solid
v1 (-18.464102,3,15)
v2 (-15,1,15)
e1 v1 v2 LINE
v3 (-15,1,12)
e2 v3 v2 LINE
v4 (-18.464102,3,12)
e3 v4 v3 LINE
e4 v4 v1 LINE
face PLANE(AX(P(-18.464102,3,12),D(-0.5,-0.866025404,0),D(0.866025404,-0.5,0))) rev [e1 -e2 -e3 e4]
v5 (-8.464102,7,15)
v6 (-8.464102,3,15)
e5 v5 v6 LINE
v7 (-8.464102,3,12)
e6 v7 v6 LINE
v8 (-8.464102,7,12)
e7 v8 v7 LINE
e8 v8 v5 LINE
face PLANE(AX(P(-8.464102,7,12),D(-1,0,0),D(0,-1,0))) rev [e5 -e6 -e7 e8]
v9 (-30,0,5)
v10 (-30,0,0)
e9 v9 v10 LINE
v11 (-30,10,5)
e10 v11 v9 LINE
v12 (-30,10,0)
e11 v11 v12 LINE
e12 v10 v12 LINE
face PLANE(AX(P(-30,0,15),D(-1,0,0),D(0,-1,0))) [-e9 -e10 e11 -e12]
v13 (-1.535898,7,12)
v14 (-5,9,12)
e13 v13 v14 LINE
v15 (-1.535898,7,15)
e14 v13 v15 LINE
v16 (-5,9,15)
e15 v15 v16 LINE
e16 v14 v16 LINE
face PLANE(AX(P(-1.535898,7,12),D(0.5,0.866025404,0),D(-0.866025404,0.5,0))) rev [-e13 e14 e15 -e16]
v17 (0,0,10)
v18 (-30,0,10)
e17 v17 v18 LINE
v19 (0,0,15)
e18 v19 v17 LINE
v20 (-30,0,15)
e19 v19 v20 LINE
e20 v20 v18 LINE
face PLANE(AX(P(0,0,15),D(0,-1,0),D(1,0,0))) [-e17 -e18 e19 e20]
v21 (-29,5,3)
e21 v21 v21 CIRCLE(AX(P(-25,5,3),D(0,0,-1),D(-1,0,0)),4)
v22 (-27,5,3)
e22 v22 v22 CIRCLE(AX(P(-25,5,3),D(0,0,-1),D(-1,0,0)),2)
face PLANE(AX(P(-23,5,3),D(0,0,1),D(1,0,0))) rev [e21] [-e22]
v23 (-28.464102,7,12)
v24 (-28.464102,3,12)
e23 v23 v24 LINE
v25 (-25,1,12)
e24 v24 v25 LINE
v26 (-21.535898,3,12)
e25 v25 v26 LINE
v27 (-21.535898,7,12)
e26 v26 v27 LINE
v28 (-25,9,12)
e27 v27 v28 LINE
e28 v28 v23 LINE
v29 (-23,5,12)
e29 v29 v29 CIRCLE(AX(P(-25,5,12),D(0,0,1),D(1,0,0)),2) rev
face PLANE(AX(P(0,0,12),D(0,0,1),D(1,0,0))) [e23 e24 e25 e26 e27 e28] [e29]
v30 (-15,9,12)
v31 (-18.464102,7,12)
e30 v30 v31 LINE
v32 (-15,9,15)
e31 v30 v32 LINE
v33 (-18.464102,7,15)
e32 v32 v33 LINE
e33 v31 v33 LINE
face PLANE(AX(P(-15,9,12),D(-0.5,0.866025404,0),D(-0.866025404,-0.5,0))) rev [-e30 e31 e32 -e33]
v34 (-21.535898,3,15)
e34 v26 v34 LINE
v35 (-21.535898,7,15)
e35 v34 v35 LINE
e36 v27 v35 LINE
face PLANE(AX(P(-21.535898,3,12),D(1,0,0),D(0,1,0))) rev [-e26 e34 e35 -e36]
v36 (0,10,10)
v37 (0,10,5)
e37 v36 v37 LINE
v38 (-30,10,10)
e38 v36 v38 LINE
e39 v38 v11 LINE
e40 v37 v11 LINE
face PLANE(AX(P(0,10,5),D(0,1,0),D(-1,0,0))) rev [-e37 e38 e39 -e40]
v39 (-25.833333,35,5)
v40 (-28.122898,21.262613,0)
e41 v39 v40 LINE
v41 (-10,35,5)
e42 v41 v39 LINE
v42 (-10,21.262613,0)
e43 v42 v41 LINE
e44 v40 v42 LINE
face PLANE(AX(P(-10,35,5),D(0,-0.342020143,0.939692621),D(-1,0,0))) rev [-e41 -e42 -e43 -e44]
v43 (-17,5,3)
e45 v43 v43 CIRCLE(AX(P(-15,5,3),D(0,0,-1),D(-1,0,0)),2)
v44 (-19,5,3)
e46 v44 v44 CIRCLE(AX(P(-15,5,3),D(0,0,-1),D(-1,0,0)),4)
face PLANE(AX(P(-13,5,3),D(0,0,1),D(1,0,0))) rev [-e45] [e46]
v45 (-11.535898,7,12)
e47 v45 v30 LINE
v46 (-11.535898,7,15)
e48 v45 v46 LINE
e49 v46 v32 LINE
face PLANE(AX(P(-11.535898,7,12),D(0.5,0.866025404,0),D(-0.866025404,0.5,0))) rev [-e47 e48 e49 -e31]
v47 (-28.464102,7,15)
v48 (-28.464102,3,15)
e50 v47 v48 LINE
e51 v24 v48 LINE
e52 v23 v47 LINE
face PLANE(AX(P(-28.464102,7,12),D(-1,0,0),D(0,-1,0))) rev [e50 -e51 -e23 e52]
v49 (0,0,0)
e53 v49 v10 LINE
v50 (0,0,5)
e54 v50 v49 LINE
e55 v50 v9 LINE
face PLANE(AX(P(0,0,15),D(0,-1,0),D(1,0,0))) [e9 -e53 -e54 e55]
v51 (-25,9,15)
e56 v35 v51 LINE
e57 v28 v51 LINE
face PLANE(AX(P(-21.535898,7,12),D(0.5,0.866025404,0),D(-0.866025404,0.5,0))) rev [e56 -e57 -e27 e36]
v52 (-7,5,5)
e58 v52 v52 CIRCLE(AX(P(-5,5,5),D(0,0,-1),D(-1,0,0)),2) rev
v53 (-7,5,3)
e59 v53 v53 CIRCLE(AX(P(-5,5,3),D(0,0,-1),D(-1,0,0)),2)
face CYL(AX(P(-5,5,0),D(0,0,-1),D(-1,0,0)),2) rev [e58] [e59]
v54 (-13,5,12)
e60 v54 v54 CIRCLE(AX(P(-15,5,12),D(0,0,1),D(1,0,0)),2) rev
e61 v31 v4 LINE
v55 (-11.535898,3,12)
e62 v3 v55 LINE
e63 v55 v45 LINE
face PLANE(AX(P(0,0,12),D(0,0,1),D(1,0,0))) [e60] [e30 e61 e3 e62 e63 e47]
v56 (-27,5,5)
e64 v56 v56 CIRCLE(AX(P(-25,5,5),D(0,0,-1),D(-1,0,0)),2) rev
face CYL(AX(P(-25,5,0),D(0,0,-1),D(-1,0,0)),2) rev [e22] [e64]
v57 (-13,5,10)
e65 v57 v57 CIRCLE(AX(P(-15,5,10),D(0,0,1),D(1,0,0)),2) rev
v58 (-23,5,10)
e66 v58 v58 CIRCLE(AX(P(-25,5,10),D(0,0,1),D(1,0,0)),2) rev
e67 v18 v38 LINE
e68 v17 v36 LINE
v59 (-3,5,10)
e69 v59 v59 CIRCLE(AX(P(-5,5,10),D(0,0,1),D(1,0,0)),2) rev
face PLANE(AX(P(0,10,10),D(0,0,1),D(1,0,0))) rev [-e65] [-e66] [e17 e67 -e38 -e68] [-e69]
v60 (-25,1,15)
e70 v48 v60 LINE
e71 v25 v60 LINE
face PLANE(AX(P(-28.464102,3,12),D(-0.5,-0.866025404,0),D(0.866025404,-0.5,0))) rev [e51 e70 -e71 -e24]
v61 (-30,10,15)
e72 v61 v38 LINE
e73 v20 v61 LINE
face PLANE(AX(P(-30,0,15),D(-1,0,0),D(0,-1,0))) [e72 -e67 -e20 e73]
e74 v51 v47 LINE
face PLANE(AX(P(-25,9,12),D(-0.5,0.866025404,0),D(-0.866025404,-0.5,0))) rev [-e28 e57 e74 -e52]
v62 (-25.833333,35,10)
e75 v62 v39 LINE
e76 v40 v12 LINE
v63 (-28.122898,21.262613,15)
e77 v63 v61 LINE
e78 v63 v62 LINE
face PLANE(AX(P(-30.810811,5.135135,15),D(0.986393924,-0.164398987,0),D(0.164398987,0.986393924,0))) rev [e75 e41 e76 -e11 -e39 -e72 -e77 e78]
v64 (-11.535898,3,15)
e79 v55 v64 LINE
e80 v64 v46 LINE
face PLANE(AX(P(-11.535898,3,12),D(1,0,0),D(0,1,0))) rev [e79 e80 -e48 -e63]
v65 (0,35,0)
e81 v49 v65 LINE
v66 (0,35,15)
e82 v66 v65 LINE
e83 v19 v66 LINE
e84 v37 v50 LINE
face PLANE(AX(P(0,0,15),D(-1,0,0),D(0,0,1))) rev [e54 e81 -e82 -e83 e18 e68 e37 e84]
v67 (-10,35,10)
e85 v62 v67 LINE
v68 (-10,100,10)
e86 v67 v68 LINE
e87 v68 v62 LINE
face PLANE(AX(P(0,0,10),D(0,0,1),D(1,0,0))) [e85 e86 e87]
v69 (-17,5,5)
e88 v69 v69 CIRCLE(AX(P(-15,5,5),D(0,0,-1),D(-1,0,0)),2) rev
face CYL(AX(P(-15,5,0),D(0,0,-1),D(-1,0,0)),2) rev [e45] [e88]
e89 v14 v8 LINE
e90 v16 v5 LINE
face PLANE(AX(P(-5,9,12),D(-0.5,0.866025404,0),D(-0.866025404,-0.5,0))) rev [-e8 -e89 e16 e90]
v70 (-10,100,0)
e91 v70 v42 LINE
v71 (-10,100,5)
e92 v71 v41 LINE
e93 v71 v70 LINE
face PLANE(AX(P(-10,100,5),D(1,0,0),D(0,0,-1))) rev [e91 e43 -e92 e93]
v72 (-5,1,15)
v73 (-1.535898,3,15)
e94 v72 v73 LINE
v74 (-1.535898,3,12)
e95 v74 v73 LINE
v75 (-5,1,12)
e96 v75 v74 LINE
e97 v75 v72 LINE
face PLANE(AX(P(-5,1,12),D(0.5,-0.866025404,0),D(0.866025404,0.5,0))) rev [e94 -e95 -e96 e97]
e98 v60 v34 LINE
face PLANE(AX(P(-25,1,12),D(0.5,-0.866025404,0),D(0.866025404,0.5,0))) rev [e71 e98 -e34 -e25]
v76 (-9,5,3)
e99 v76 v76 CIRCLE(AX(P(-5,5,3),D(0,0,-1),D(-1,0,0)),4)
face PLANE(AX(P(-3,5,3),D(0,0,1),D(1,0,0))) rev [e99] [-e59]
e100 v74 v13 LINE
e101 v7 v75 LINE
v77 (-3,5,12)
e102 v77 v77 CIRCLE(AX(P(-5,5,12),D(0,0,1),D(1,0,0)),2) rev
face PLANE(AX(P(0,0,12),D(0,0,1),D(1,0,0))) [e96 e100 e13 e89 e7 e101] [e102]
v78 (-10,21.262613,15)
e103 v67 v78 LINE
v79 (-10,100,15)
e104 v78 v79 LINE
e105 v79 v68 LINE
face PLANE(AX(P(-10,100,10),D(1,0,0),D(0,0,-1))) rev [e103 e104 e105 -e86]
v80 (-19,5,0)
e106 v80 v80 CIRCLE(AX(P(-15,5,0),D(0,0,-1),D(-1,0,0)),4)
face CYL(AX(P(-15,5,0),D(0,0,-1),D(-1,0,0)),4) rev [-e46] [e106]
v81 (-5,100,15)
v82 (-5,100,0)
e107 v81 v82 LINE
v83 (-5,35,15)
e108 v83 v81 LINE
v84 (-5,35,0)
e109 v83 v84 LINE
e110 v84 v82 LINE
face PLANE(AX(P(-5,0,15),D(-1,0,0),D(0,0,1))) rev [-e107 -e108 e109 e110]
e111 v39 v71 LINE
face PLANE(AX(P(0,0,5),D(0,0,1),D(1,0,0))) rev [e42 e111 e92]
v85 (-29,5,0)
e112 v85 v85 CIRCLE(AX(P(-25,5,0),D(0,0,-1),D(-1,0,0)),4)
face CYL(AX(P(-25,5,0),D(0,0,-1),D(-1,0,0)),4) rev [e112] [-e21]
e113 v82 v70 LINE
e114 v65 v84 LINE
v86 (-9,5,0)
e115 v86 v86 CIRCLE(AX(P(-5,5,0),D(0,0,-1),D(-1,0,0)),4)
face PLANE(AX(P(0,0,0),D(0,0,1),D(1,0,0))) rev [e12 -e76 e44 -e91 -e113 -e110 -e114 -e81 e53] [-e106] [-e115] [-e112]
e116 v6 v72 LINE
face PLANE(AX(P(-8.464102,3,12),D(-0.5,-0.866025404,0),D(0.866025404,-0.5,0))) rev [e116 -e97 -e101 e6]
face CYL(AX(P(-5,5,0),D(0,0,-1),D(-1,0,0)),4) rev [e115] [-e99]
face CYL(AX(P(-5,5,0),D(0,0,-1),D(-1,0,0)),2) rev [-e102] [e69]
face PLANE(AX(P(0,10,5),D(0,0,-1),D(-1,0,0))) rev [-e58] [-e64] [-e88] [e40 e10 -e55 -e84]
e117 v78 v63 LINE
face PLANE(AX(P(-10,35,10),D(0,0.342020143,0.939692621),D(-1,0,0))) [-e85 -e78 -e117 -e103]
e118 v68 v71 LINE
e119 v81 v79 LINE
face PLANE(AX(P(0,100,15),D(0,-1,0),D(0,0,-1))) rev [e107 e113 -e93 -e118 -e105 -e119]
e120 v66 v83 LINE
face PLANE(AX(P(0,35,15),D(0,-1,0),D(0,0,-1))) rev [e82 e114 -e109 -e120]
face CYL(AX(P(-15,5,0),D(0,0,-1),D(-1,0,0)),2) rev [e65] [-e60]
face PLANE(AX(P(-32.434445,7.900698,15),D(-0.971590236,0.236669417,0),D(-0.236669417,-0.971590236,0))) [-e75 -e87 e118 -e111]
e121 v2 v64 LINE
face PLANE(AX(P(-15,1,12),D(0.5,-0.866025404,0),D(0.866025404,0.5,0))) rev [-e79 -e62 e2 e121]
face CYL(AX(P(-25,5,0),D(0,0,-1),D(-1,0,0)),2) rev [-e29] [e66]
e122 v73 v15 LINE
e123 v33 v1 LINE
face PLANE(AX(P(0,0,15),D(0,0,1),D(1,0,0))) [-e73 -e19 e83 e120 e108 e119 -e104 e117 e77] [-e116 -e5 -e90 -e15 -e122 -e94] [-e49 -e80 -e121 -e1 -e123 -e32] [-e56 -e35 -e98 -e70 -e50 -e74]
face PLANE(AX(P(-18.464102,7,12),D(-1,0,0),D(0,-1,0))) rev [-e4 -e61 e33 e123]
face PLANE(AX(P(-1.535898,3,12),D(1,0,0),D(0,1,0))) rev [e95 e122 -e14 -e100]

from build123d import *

# Parameters (mm, degrees)
SKETCH1_W                                        = 10
SKETCH1_H                                        = 65
SKETCH1_H_2                                      = 25
SKETCH1_W_2                                      = 5
SKETCH1_H_3                                      = 10
SKETCH1_W_3                                      = 15
BOSS_EXTRUDE1_DEPTH                              = 15
CBORE_FOR_M4_HEX_HEAD_MACHINE_SCREW1_D           = 4
CBORE_FOR_M4_HEX_HEAD_MACHINE_SCREW1_CBORE_D     = 8
CBORE_FOR_M4_HEX_HEAD_MACHINE_SCREW1_CBORE_DEPTH = 3
CUT_EXTRUDE1_DEPTH                               = 3
SKETCH7_W                                        = 5
SKETCH7_H                                        = 10
CUT_EXTRUDE2_DEPTH                               = 106.475115549
CUT_EXTRUDE3_DEPTH                               = 106.475115549
CUT_EXTRUDE4_DEPTH                               = 5
CUT_EXTRUDE5_DEPTH                               = 5
CHAMFER1_SIZE2                                   = 5
CHAMFER1_SIZE                                    = 13.737387097
CHAMFER2_SIZE2                                   = 5
CHAMFER2_SIZE                                    = 13.737387097


with BuildPart() as part:
    # Sketch1 → Boss-Extrude1 (new body)
    with BuildSketch(Plane.XY):
        Polygon((-30, 10), (-15, 10), (-15, 35), (-15, 100), align=None)
        with Locations((-10, 67.5)):
            Rectangle(SKETCH1_W, SKETCH1_H)
        with Locations((-10, 22.5)):
            Rectangle(SKETCH1_W, SKETCH1_H_2)
        with Locations((-2.5, 22.5)):
            Rectangle(SKETCH1_W_2, SKETCH1_H_2)
        with Locations((-2.5, 5)):
            Rectangle(SKETCH1_W_2, SKETCH1_H_3)
        with Locations((-10, 5)):
            Rectangle(SKETCH1_W, SKETCH1_H_3)
        with Locations((-22.5, 5)):
            Rectangle(SKETCH1_W_3, SKETCH1_H_3)
    extrude(amount=BOSS_EXTRUDE1_DEPTH)

    # CBORE for M4 Hex Head Machine Screw1 (through all)
    with Locations(Plane(origin=(0, 0, 0), x_dir=(-1, 0, 0), z_dir=(0, 0, -1))):
        with Locations((25, 5), (15, 5), (5, 5)):
            CounterBoreHole(CBORE_FOR_M4_HEX_HEAD_MACHINE_SCREW1_D / 2, CBORE_FOR_M4_HEX_HEAD_MACHINE_SCREW1_CBORE_D / 2, CBORE_FOR_M4_HEX_HEAD_MACHINE_SCREW1_CBORE_DEPTH)

    # Sketch6 → Cut-Extrude1 (cut)
    with BuildSketch(Plane.XY.offset(15)):
        Polygon((-15, 9), (-18.464101615, 7), (-18.464101615, 3), (-15, 1), (-11.535898385, 3), (-11.535898385, 7), align=None)
        Polygon((-25, 9), (-28.464101615, 7), (-28.464101615, 3), (-25, 1), (-21.535898385, 3), (-21.535898385, 7), align=None)
        Polygon((-5, 9), (-8.464101615, 7), (-8.464101615, 3), (-5, 1), (-1.535898385, 3), (-1.535898385, 7), align=None)
    extrude(amount=-CUT_EXTRUDE1_DEPTH, mode=Mode.SUBTRACT)

    # Sketch7 → Cut-Extrude2 (cut, through all)
    with BuildSketch(Plane.ZY.offset(30)):
        with Locations((7.5, 5)):
            Rectangle(SKETCH7_W, SKETCH7_H)
    extrude(amount=-CUT_EXTRUDE2_DEPTH, mode=Mode.SUBTRACT)

    # Sketch8 → Cut-Extrude3 (cut, through all)
    with BuildSketch(Plane(origin=(0, 0, 0), x_dir=(-1, 0, 0), z_dir=(0, 0, -1))):
        Polygon((15, 100), (10, 100), (25.833333333, 35), align=None)
    extrude(amount=-CUT_EXTRUDE3_DEPTH, mode=Mode.SUBTRACT)

    # Sketch9 → Cut-Extrude4 (cut)
    with BuildSketch(Plane(origin=(0, 0, 0), x_dir=(-1, 0, 0), z_dir=(0, 0, -1))):
        Polygon((10, 100), (10, 35), (25.833333333, 35), align=None)
    extrude(amount=-CUT_EXTRUDE4_DEPTH, mode=Mode.SUBTRACT)

    # Sketch10 → Cut-Extrude5 (cut)
    with BuildSketch(Plane.XY.offset(15)):
        Polygon((-10, 100), (-10, 35), (-25.833333333, 35), align=None)
    extrude(amount=-CUT_EXTRUDE5_DEPTH, mode=Mode.SUBTRACT)

    # Chamfer1
    chamfer1_edges = [part.edges().sort_by_distance(p)[0] for p in [
        (-17.916666667, 35, 15),
    ]]
    chamfer1_side = [part.faces().sort_by_distance(p)[0] for p in [
        (-17.916666667, 34.9, 15),
    ]]
    chamfer(chamfer1_edges, length=CHAMFER1_SIZE - 0.0001, length2=CHAMFER1_SIZE2 - 0.0001, reference=chamfer1_side[0])  # a hair under: the kernel refuses the full size

    # Chamfer2
    chamfer2_edges = [part.edges().sort_by_distance(p)[0] for p in [
        (-17.916666667, 35, 0),
    ]]
    chamfer2_side = [part.faces().sort_by_distance(p)[0] for p in [
        (-17.916666667, 34.9, 0),
    ]]
    chamfer(chamfer2_edges, length=CHAMFER2_SIZE - 0.0001, length2=CHAMFER2_SIZE2 - 0.0001, reference=chamfer2_side[0])  # a hair under: the kernel refuses the full size


solid = part.part
